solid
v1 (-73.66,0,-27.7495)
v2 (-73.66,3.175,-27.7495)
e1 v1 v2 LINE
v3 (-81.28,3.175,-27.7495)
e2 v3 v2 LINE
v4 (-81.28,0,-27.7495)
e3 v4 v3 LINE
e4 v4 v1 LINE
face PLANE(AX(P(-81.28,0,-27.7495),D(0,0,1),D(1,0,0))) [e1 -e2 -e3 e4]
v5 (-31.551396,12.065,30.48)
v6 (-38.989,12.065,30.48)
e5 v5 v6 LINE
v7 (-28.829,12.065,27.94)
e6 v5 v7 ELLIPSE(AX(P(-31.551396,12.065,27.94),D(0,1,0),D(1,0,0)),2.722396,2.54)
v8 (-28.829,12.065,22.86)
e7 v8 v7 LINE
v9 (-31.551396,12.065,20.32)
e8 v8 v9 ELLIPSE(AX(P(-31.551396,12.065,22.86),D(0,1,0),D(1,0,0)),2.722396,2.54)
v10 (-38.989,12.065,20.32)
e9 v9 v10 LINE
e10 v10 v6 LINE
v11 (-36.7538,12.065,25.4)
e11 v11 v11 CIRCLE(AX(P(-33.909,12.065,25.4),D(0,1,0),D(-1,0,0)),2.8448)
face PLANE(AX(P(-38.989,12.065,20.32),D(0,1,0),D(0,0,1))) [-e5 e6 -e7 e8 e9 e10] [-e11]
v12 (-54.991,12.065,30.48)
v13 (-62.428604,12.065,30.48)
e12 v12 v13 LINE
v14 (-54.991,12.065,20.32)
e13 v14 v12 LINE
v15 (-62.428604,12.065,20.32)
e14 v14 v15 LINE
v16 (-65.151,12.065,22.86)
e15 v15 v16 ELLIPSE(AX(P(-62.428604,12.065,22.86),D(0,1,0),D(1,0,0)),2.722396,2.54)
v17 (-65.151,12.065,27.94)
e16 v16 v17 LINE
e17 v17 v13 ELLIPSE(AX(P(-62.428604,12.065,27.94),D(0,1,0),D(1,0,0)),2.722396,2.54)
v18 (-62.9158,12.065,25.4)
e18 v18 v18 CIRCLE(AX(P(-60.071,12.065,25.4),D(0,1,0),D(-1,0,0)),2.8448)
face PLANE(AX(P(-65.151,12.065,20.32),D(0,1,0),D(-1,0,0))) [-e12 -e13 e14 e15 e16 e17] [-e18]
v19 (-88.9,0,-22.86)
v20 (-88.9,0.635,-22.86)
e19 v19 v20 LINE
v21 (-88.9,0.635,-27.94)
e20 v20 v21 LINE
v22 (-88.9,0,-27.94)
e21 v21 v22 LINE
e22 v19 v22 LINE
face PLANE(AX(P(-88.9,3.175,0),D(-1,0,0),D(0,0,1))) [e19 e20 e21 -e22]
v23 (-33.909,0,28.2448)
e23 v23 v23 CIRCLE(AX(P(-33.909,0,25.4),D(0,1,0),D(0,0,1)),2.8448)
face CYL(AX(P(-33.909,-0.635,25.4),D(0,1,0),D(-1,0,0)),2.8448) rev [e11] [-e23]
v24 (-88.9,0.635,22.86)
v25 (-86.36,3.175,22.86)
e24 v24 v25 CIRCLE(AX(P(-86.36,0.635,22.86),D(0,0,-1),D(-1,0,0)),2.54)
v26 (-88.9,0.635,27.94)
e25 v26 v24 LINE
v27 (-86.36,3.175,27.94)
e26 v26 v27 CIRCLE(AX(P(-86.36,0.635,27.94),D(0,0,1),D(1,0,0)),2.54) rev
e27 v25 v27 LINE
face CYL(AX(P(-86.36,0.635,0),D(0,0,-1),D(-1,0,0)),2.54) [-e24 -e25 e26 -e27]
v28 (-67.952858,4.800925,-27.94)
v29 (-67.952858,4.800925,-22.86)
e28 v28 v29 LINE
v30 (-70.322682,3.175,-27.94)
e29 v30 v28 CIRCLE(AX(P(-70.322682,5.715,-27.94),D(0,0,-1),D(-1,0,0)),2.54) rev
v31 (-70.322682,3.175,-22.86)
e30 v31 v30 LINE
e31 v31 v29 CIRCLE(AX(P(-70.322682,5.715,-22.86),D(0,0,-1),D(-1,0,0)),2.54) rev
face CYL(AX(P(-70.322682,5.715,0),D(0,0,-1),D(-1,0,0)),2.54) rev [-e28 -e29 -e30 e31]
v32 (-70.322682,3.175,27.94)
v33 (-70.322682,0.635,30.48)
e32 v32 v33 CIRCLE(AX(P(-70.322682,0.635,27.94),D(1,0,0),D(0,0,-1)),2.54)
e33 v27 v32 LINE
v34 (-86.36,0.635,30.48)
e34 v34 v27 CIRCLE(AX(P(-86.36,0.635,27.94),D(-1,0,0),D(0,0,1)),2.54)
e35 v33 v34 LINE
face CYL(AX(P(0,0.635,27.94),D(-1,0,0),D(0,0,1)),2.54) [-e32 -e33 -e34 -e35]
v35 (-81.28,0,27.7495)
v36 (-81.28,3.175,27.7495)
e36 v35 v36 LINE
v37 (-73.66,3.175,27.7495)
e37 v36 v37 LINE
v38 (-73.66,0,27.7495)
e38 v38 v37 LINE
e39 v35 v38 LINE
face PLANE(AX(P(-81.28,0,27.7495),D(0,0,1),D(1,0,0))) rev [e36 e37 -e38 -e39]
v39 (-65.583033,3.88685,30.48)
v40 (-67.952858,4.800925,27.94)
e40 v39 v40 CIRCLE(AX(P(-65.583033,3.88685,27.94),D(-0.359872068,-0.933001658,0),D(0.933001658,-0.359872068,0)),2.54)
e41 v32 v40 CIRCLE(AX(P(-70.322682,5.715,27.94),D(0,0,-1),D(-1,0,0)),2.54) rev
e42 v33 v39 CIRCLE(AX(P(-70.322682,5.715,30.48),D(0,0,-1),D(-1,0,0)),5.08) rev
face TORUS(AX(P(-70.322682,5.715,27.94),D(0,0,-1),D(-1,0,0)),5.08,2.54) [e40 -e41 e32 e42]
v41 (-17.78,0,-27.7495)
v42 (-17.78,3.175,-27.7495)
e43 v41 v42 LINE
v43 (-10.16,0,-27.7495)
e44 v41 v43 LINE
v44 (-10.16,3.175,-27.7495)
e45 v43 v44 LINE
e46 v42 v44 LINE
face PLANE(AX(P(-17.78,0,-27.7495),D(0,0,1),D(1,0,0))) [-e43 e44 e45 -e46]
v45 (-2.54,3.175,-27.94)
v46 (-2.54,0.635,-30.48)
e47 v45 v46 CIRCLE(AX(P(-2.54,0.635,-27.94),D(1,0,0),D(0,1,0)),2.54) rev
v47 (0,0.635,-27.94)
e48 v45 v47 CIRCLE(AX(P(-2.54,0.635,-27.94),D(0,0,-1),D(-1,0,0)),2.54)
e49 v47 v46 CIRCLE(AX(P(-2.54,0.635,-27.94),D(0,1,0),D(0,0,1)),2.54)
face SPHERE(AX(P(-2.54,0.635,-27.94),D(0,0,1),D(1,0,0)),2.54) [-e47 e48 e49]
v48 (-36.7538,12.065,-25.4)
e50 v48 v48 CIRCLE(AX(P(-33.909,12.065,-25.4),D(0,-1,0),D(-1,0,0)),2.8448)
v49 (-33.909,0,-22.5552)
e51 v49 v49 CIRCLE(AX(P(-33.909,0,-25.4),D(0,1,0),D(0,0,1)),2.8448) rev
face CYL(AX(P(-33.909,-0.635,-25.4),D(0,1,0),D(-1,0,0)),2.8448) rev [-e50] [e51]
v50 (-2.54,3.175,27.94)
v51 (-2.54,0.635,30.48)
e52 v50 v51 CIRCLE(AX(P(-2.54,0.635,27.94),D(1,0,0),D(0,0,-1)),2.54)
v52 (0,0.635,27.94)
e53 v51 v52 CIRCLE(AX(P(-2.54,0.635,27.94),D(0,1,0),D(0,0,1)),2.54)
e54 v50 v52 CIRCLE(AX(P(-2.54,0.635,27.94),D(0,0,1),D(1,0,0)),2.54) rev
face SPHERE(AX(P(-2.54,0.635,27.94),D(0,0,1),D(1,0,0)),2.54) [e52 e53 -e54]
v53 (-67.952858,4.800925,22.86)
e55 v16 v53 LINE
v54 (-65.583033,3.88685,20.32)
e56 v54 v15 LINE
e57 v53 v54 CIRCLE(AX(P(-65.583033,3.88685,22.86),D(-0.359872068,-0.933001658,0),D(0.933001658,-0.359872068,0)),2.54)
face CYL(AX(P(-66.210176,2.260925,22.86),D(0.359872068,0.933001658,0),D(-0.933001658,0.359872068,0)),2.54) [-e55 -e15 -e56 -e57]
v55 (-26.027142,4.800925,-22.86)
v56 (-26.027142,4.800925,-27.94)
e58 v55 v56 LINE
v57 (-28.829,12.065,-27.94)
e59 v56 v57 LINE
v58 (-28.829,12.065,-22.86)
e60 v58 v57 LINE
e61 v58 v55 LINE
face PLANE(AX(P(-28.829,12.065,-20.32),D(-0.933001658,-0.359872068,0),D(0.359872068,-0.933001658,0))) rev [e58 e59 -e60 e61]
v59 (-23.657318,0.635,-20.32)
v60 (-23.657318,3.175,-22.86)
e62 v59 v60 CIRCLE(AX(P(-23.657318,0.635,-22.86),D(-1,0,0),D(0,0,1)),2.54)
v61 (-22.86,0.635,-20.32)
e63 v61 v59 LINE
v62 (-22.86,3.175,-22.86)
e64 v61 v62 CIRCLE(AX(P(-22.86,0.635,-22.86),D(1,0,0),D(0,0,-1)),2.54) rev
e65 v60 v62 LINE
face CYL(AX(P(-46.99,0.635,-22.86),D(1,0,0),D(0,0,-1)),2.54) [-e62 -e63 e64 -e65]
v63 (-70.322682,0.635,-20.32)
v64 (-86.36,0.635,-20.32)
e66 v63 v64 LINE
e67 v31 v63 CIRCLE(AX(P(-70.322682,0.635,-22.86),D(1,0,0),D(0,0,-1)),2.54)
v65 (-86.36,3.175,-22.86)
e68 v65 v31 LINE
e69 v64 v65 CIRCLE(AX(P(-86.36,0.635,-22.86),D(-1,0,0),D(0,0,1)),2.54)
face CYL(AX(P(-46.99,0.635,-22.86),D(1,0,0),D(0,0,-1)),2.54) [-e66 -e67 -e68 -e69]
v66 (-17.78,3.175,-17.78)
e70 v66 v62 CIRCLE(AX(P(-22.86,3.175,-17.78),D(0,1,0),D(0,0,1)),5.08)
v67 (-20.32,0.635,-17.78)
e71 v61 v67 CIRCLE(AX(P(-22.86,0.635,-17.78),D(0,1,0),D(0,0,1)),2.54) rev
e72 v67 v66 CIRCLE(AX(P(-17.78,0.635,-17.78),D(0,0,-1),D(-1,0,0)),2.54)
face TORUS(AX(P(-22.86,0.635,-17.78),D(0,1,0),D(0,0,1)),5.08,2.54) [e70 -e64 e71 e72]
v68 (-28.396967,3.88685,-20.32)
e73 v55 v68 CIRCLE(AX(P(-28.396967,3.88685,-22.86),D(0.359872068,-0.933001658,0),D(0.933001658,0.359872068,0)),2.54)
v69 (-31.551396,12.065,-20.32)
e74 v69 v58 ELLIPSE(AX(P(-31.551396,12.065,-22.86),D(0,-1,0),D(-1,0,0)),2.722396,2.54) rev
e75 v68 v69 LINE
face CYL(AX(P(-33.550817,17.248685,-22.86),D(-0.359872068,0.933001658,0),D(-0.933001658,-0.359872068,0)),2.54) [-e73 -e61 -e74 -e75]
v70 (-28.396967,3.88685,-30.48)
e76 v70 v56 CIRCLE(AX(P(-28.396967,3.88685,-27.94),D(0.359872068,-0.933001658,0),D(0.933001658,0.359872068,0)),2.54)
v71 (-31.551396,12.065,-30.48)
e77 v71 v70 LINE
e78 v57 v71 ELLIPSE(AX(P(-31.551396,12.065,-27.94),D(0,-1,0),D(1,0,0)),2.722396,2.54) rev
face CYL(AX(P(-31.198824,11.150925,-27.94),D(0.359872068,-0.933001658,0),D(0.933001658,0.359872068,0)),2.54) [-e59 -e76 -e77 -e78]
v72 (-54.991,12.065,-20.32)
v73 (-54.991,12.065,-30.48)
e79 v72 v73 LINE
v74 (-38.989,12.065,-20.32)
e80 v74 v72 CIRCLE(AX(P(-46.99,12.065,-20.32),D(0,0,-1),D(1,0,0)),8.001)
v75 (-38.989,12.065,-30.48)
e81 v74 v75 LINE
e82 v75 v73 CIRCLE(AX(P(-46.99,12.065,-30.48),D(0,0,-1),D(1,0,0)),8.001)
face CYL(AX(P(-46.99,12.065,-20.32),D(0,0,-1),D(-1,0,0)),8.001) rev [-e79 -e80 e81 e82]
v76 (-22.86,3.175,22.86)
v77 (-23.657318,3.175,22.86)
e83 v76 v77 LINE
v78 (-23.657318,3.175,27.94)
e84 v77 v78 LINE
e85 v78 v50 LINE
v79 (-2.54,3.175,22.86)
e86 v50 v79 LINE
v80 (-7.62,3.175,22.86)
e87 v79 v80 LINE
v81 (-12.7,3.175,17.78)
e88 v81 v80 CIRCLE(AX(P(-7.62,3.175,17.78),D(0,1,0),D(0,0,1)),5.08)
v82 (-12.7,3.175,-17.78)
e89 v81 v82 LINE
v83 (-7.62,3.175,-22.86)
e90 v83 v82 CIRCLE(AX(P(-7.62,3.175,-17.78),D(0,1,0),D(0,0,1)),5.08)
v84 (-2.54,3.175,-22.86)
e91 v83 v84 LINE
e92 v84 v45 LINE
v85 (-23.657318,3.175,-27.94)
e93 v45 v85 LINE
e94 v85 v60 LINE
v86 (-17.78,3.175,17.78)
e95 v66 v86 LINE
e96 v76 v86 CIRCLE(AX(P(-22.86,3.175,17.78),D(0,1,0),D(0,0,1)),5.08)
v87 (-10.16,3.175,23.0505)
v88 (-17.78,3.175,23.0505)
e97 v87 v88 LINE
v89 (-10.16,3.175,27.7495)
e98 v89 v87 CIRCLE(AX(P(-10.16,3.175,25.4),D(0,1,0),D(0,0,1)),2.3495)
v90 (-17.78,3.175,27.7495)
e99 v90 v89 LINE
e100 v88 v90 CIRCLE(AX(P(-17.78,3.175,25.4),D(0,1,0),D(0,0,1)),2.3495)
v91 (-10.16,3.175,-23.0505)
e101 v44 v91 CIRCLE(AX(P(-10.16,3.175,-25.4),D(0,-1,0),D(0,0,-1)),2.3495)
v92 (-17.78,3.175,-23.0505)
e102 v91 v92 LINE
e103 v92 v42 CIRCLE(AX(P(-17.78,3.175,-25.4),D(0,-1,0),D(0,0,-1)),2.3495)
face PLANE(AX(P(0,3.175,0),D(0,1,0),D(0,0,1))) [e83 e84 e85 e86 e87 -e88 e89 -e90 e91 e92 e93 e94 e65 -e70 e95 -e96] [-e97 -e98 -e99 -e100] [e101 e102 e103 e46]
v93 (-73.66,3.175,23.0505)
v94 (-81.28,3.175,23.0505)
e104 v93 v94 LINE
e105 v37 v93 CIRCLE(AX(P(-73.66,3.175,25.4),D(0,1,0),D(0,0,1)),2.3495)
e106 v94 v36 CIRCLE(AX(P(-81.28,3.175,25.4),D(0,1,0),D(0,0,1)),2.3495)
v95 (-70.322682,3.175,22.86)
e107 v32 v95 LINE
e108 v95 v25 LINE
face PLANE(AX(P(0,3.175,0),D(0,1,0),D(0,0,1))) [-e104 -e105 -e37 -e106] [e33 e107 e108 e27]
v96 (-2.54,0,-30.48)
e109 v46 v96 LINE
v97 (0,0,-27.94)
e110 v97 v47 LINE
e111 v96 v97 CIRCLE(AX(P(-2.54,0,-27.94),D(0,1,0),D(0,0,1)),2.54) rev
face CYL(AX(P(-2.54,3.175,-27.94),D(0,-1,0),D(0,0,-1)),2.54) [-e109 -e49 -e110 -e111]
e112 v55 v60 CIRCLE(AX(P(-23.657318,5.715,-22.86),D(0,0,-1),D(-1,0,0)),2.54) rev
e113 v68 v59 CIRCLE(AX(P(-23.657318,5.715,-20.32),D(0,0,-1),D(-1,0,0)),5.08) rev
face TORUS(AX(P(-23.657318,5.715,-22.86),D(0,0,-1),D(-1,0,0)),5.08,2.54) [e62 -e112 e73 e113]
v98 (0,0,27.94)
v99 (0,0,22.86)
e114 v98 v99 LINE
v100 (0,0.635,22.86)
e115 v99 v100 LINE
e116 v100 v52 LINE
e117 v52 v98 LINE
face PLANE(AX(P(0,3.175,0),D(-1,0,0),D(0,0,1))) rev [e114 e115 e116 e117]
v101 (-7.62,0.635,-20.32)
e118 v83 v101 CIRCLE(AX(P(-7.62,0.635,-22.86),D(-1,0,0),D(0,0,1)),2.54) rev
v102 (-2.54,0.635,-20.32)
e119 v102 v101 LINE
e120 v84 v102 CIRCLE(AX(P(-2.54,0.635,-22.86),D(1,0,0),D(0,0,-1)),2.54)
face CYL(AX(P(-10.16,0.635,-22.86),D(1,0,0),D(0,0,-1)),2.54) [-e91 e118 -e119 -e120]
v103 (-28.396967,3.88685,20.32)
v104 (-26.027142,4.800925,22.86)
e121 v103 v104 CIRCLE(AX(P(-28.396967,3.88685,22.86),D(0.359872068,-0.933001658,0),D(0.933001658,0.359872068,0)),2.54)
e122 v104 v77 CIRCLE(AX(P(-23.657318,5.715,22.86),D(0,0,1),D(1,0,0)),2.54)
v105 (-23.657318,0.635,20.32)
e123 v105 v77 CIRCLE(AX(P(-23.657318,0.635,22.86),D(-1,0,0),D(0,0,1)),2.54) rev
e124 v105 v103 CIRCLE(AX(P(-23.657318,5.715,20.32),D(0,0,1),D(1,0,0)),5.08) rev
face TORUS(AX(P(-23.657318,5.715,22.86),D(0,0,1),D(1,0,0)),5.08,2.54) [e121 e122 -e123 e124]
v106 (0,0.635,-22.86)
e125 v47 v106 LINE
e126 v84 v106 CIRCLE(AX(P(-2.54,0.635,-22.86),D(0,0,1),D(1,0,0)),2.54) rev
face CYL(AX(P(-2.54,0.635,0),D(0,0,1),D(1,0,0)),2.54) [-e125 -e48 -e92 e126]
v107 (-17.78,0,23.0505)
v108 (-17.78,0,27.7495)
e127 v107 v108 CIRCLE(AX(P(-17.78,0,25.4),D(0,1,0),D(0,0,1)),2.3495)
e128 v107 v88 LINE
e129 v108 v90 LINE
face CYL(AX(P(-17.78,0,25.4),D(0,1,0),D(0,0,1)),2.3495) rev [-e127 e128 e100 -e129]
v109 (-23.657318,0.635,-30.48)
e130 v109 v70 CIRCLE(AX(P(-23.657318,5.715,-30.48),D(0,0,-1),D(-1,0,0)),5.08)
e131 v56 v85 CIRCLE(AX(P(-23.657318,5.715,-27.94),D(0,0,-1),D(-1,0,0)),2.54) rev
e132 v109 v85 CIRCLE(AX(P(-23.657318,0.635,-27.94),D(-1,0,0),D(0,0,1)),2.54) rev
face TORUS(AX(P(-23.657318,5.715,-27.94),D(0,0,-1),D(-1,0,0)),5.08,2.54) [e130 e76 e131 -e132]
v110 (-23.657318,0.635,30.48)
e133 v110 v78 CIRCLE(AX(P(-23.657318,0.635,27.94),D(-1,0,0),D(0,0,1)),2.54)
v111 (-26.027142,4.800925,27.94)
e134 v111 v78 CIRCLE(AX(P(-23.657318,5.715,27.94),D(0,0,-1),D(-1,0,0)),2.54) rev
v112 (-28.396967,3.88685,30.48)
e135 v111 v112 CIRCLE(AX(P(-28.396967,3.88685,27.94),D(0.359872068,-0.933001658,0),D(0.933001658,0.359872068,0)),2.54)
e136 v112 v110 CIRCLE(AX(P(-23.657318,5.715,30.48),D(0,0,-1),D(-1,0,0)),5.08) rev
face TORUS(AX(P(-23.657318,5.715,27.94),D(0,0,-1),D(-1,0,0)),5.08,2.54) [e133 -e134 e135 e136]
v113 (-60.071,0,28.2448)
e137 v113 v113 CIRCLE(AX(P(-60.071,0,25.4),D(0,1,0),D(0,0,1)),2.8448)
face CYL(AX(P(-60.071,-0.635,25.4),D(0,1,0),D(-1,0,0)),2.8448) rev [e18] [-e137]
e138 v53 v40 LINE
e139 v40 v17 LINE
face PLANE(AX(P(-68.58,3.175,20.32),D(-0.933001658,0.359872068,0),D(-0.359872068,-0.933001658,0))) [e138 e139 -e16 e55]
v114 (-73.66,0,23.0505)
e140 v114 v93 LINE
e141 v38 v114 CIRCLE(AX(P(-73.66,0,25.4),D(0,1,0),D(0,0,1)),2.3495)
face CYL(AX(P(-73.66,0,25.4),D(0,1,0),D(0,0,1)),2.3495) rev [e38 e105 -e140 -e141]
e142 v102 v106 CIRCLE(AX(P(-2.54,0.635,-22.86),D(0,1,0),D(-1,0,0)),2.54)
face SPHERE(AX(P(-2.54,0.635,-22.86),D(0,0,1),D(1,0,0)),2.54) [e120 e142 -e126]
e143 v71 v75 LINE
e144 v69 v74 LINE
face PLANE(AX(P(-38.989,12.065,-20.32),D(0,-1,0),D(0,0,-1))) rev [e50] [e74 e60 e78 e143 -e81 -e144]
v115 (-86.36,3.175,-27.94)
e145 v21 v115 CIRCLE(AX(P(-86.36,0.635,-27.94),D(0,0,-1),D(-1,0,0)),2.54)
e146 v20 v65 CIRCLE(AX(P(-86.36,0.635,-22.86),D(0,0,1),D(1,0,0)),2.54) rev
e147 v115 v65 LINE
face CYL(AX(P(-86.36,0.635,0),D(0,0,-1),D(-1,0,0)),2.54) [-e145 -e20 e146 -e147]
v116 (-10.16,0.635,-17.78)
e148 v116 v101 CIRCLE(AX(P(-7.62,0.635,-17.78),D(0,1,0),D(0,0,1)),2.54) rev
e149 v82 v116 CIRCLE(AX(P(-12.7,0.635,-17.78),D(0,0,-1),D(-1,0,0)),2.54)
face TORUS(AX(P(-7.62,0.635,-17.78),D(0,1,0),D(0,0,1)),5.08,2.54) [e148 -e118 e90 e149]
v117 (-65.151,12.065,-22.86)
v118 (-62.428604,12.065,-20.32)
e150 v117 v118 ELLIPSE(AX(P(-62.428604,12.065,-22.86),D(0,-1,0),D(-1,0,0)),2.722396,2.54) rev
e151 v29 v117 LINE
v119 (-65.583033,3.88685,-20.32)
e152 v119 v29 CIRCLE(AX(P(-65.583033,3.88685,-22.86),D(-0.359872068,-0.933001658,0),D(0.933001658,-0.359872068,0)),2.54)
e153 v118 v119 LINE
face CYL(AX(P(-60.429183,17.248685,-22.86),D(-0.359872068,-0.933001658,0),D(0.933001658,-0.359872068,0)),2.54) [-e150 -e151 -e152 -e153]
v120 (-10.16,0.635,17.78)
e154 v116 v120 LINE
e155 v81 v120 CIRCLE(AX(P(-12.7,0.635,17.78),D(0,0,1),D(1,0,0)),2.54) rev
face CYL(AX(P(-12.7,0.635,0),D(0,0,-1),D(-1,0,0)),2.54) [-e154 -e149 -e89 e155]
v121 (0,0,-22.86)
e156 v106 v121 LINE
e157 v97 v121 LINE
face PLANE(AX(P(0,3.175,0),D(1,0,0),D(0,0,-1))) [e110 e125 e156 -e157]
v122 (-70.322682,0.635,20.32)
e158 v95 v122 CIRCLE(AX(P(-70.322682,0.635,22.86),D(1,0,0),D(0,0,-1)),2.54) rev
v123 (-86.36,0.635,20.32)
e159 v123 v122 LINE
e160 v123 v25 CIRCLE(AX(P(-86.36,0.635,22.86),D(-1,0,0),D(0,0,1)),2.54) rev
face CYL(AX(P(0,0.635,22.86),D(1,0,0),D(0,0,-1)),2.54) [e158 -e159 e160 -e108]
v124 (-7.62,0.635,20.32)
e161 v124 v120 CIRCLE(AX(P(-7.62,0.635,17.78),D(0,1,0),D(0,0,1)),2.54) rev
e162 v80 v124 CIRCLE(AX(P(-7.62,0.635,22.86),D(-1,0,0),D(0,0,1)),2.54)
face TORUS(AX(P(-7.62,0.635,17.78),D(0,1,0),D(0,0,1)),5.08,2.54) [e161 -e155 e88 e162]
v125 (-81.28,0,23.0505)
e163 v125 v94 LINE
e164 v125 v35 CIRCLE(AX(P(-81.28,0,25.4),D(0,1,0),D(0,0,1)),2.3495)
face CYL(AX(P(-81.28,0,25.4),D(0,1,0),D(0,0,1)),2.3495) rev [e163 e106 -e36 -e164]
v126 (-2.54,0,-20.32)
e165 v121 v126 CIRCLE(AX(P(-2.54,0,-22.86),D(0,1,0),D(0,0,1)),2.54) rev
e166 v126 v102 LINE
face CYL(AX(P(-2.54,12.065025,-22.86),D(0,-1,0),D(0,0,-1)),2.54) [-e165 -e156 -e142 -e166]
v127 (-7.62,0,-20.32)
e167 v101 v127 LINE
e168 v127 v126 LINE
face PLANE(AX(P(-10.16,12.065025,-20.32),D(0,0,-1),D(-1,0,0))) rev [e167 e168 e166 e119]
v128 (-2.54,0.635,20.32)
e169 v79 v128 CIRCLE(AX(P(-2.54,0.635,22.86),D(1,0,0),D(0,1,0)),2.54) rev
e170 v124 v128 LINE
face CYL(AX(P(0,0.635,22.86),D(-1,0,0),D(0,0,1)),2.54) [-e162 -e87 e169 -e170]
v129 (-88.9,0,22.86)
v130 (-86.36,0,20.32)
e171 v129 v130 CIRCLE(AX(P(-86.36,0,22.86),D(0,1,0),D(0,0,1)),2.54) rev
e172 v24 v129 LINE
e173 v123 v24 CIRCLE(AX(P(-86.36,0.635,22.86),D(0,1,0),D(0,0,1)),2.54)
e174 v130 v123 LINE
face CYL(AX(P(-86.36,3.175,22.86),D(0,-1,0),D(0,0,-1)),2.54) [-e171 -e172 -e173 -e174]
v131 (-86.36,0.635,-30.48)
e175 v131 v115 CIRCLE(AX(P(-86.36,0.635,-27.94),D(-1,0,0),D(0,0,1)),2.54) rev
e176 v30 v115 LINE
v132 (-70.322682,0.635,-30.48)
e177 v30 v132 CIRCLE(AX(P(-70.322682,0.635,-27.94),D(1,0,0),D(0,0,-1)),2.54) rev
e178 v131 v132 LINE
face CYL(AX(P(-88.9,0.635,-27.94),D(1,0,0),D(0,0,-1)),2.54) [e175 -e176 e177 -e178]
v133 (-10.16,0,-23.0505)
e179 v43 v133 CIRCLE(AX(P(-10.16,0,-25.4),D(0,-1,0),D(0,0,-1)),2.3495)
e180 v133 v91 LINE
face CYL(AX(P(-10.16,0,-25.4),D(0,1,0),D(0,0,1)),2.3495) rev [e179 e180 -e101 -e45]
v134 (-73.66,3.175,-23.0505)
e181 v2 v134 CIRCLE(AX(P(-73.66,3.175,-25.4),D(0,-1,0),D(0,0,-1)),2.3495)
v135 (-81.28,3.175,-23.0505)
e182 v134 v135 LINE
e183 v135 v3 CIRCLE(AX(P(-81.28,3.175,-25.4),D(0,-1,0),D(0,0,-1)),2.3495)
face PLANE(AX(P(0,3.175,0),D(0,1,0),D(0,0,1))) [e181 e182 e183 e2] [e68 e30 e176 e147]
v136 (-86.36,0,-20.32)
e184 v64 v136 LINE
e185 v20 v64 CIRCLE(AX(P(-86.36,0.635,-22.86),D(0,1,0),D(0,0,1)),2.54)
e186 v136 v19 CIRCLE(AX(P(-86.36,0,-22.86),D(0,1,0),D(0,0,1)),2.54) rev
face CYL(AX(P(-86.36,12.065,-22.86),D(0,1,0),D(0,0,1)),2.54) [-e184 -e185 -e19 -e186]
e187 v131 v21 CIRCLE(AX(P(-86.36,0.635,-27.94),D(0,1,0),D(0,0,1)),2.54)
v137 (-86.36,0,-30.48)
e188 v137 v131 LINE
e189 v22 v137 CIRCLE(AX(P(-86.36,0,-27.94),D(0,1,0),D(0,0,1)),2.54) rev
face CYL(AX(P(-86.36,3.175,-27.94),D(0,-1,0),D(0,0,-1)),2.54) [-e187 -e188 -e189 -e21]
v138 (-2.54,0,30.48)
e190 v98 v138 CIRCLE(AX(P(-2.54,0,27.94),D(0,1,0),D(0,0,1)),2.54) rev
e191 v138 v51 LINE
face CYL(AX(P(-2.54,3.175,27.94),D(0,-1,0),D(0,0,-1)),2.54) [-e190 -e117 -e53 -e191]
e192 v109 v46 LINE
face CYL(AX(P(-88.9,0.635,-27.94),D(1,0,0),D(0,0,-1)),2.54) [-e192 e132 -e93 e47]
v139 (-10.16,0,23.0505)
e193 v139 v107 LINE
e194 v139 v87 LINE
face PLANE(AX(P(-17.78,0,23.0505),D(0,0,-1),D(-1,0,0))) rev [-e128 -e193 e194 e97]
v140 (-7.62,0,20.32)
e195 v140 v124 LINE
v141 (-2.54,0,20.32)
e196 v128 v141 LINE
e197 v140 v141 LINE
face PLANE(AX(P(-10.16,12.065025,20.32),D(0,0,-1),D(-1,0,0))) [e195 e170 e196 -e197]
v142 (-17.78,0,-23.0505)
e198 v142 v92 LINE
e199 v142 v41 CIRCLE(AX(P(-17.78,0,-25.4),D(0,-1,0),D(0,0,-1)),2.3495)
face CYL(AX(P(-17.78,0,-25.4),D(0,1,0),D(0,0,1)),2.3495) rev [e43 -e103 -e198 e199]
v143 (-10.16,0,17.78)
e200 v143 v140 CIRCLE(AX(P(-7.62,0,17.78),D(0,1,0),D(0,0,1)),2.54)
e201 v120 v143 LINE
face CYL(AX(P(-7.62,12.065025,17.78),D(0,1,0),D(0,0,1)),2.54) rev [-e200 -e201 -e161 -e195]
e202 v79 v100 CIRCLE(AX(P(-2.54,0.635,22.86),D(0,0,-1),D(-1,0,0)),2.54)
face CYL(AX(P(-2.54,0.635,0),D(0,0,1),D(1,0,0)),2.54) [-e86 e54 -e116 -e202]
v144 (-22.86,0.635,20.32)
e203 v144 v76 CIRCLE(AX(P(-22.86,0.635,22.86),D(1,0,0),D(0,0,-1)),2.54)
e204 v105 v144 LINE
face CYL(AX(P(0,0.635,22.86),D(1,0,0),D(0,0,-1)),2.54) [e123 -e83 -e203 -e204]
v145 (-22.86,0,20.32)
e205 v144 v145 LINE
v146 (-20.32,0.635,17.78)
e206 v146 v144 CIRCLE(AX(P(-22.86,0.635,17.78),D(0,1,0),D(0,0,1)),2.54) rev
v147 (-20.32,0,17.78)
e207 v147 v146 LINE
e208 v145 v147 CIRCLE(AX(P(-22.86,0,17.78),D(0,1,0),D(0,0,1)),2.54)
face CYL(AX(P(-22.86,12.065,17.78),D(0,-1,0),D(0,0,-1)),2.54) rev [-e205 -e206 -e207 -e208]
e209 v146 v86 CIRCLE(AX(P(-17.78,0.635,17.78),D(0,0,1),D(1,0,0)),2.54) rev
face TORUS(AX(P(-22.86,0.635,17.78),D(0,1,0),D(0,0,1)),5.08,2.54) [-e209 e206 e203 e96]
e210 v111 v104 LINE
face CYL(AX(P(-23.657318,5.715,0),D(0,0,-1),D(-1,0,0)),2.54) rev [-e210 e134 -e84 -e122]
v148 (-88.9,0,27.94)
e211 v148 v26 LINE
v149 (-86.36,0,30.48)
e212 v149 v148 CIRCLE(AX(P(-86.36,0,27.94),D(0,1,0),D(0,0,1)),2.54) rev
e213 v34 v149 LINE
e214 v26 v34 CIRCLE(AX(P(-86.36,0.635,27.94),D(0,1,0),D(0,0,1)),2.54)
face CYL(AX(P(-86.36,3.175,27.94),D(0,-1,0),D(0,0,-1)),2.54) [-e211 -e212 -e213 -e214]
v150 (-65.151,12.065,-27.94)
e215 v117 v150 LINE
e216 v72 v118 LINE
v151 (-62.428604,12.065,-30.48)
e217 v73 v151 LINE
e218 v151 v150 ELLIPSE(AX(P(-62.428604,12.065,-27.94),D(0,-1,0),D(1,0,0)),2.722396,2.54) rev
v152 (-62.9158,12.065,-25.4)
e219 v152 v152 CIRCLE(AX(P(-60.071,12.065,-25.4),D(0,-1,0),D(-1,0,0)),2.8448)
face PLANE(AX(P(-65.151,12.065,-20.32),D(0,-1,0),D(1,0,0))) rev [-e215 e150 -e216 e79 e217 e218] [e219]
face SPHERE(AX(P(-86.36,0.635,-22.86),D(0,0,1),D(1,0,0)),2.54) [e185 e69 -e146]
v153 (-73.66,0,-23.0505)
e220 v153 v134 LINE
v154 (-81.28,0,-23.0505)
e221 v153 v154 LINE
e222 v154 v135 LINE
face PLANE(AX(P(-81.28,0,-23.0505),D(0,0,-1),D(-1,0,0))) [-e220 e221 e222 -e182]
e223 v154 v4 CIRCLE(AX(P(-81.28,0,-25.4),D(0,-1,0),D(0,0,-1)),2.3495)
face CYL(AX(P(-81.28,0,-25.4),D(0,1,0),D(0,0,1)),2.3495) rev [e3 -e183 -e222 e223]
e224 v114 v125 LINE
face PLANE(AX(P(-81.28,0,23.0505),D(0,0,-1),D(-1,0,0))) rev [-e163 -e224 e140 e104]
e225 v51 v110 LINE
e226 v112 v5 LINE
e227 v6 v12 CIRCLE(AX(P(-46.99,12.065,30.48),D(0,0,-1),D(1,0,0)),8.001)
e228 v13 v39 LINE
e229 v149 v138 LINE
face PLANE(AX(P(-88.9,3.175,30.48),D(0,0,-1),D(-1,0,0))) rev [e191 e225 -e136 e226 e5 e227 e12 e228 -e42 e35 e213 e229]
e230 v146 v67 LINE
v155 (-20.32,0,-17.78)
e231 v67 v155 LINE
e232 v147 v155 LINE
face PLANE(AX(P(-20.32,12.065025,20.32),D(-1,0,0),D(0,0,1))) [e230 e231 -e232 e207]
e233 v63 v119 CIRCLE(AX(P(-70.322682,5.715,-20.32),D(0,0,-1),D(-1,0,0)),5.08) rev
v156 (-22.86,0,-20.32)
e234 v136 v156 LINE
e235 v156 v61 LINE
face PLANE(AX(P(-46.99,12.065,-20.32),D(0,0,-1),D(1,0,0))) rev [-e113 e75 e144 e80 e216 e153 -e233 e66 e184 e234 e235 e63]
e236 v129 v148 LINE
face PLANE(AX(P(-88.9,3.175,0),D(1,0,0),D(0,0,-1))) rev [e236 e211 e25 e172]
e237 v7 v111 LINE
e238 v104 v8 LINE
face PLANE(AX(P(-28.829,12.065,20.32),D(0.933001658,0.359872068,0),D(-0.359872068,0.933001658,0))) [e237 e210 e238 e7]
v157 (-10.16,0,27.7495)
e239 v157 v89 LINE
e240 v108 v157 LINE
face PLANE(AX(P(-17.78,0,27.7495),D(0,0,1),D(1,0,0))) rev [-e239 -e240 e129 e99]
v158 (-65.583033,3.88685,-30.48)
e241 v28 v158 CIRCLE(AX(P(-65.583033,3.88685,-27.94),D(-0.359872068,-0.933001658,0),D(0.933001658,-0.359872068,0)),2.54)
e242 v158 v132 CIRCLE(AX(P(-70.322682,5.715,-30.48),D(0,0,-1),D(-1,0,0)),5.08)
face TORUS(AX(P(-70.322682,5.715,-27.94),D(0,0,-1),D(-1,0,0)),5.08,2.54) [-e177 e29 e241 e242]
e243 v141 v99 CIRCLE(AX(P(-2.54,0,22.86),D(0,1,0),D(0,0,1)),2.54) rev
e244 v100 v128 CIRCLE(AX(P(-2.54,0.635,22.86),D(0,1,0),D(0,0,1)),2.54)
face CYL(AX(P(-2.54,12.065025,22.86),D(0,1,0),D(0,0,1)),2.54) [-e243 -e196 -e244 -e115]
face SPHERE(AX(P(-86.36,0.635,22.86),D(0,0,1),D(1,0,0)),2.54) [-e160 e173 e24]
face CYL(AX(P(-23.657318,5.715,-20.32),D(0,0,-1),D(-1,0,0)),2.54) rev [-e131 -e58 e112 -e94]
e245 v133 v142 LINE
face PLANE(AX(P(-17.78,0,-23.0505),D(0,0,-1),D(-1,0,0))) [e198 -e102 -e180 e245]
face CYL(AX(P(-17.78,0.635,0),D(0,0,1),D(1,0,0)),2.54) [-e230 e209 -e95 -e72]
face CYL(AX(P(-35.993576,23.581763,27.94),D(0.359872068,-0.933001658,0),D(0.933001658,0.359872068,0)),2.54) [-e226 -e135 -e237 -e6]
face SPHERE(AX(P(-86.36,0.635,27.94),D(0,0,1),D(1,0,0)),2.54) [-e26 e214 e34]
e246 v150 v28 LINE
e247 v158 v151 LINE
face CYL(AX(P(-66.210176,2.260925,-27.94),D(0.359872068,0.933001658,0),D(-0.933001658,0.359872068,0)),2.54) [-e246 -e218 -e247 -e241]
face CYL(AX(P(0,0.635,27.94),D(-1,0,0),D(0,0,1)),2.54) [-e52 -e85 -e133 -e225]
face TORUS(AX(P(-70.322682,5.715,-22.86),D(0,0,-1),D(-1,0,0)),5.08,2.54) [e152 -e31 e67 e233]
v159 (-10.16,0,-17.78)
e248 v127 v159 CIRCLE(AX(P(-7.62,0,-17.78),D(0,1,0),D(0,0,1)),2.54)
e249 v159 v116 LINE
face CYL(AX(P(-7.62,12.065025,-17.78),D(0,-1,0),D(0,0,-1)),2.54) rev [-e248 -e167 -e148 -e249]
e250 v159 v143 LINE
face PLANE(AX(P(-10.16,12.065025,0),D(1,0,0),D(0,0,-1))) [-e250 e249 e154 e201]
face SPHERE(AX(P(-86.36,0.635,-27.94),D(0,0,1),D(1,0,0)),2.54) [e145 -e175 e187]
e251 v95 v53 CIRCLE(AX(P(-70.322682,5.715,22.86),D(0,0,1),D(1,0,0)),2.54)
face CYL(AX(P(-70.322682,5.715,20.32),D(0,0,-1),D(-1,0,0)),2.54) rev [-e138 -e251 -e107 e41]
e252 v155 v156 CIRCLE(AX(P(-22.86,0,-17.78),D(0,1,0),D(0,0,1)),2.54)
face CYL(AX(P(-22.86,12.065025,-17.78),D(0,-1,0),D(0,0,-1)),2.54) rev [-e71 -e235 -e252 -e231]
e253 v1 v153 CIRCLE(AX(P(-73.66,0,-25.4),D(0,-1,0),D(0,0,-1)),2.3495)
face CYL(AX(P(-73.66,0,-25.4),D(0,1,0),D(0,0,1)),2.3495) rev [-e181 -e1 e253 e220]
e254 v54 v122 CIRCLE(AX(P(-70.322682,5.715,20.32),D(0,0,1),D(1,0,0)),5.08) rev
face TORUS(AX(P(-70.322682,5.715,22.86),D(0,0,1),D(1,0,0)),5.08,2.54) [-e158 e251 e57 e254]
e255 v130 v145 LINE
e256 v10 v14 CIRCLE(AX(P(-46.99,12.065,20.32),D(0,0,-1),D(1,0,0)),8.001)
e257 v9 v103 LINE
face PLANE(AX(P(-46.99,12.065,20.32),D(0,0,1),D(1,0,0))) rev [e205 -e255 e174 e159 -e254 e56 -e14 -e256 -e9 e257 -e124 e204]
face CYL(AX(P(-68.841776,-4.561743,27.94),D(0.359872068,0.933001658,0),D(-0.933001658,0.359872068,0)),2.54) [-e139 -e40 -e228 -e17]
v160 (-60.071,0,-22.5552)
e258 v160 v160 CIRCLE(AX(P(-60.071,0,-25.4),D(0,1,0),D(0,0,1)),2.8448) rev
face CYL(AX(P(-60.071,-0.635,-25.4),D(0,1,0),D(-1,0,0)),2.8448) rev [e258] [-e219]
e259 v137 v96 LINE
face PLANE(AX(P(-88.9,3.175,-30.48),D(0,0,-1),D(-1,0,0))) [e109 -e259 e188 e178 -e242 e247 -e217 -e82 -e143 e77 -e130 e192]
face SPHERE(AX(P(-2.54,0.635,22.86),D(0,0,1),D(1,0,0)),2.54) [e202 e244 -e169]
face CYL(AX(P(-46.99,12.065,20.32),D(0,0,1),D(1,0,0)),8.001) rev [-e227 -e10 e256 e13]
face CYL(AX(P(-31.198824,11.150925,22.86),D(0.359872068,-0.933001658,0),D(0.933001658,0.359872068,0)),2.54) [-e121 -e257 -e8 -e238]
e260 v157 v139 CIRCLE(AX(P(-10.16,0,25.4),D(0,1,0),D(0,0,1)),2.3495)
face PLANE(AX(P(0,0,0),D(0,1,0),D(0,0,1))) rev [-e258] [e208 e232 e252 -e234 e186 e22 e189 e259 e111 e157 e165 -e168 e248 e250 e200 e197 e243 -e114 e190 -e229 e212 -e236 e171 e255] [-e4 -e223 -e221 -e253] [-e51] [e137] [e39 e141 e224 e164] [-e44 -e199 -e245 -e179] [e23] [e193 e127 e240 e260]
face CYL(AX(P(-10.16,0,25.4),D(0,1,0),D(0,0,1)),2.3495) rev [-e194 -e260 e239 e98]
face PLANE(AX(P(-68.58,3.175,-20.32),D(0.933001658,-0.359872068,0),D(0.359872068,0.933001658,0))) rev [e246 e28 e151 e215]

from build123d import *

# Parameters (mm, degrees)
SKETCH1_W           = 88.9
SKETCH1_H           = 30.48
BOSS_EXTRUDE1_DEPTH = 3.175
BOSS_EXTRUDE2_DEPTH = 10.16
SKETCH3_W           = 68.58
SKETCH3_H           = 20.32
SKETCH3_W_2         = 10.16
CUT_EXTRUDE1_DEPTH  = 95.751277696
SKETCH5_R           = 2.8448
CUT_EXTRUDE2_DEPTH  = 12.7
CUT_EXTRUDE3_DEPTH  = 95.399536545
FILLET1_R           = 2.54


with BuildPart() as part:
    # Sketch1 → Boss-Extrude1 (new body)
    with BuildSketch(Plane(origin=(0, 0, 0), x_dir=(1, 0, 0), z_dir=(0, 1, 0))):
        with Locations((-44.45, -15.24)):
            Rectangle(SKETCH1_W, SKETCH1_H)
    boss_extrude1 = extrude(amount=BOSS_EXTRUDE1_DEPTH)

    # Sketch2 → Boss-Extrude2 (add)
    with BuildSketch(Plane.XY.offset(30.48)):
        with BuildLine():
            Line((-68.58, 3.175), (-65.151, 12.065))
            Line((-65.151, 12.065), (-54.991, 12.065))
            ThreePointArc((-54.991, 12.065), (-46.99, 4.064), (-38.989, 12.065))
            Line((-38.989, 12.065), (-28.829, 12.065))
            Line((-28.829, 12.065), (-25.4, 3.175))
            Line((-25.4, 3.175), (-68.58, 3.175))
        make_face()
    boss_extrude2 = extrude(amount=-BOSS_EXTRUDE2_DEPTH)

    # Sketch3 → Cut-Extrude1 (cut, through all)
    with BuildSketch(Plane(origin=(0, 0, 0), x_dir=(1, 0, 0), z_dir=(0, 1, 0))):
        with Locations((-54.61, -10.16)):
            Rectangle(SKETCH3_W, SKETCH3_H)
        with Locations((-5.08, -10.16)):
            Rectangle(SKETCH3_W_2, SKETCH3_H)
    cut_extrude1 = extrude(amount=CUT_EXTRUDE1_DEPTH, mode=Mode.SUBTRACT)

    # Sketch5 → Cut-Extrude2 (cut)
    with BuildSketch(Plane(origin=(0, 12.065, 0), x_dir=(1, 0, 0), z_dir=(0, 1, 0))):
        with Locations((-33.909, -25.4)):
            Circle(SKETCH5_R)
        with Locations((-60.071, -25.4)):
            Circle(SKETCH5_R)
    cut_extrude2 = extrude(amount=-CUT_EXTRUDE2_DEPTH, mode=Mode.SUBTRACT)

    # Sketch6 → Cut-Extrude3 (cut, through all)
    with BuildSketch(Plane(origin=(0, 3.175, 0), x_dir=(1, 0, 0), z_dir=(0, 1, 0))):
        with BuildLine():
            Line((-81.28, -23.0505), (-73.66, -23.0505))
            ThreePointArc((-73.66, -23.0505), (-71.3105, -25.4), (-73.66, -27.7495))
            Line((-73.66, -27.7495), (-81.28, -27.7495))
            ThreePointArc((-81.28, -27.7495), (-83.6295, -25.4), (-81.28, -23.0505))
        make_face()
        with BuildLine():
            Line((-17.78, -23.0505), (-10.16, -23.0505))
            ThreePointArc((-10.16, -23.0505), (-7.8105, -25.4), (-10.16, -27.7495))
            Line((-10.16, -27.7495), (-17.78, -27.7495))
            ThreePointArc((-17.78, -27.7495), (-20.1295, -25.4), (-17.78, -23.0505))
        make_face()
    cut_extrude3 = extrude(amount=-CUT_EXTRUDE3_DEPTH, mode=Mode.SUBTRACT)

    # Mirror4: Boss-Extrude1, Boss-Extrude2, Cut-Extrude1, Cut-Extrude2, Cut-Extrude3 across plane
    add(boss_extrude1.mirror(Plane.XY))
    add(boss_extrude2.mirror(Plane.XY))
    add(cut_extrude1.mirror(Plane.XY), mode=Mode.SUBTRACT)
    add(cut_extrude2.mirror(Plane.XY), mode=Mode.SUBTRACT)
    add(cut_extrude3.mirror(Plane.XY), mode=Mode.SUBTRACT)

    # Fillet1
    fillet1_edges = [part.edges().sort_by_distance(p)[0] for p in [
        (-78.74, 3.175, -30.48),
        (-66.8655, 7.62, -20.32),
        (-78.74, 3.175, 20.32),
        (-78.74, 3.175, 30.48),
        (-12.7, 3.175, -30.48),
        (-27.1145, 7.62, -20.32),
        (-22.86, 3.175, 20.32),
        (-12.7, 3.175, 30.48),
        (-20.32, 1.5875, -20.32),
        (-20.32, 1.5875, 20.32),
        (0, 1.5875, -30.48),
        (0, 1.5875, 30.48),
        (-88.9, 1.5875, 20.32),
        (-88.9, 1.5875, 30.48),
        (-88.9, 1.5875, -30.48),
        (-88.9, 1.5875, -20.32),
        (-88.9, 3.175, -25.4),
        (-66.8655, 7.62, -30.48),
        (-78.74, 3.175, -20.32),
        (-88.9, 3.175, 25.4),
        (-66.8655, 7.62, 20.32),
        (-66.8655, 7.62, 30.48),
        (0, 3.175, 25.4),
        (-27.1145, 7.62, -30.48),
        (-22.86, 3.175, -20.32),
        (-20.32, 3.175, 0),
        (-27.1145, 7.62, 20.32),
        (-27.1145, 7.62, 30.48),
        (-25.4, 3.175, 25.4),
        (-25.4, 3.175, -25.4),
        (-68.58, 3.175, 25.4),
        (-68.58, 3.175, -25.4),
        (0, 1.5875, 20.32),
        (-10.16, 1.5875, 20.32),
        (-10.16, 1.5875, -20.32),
        (0, 1.5875, -20.32),
        (0, 3.175, -25.4),
        (-5.08, 3.175, -20.32),
        (-10.16, 3.175, 0),
        (-5.08, 3.175, 20.32),
    ]]
    fillet(fillet1_edges, radius=FILLET1_R)


solid = part.part
